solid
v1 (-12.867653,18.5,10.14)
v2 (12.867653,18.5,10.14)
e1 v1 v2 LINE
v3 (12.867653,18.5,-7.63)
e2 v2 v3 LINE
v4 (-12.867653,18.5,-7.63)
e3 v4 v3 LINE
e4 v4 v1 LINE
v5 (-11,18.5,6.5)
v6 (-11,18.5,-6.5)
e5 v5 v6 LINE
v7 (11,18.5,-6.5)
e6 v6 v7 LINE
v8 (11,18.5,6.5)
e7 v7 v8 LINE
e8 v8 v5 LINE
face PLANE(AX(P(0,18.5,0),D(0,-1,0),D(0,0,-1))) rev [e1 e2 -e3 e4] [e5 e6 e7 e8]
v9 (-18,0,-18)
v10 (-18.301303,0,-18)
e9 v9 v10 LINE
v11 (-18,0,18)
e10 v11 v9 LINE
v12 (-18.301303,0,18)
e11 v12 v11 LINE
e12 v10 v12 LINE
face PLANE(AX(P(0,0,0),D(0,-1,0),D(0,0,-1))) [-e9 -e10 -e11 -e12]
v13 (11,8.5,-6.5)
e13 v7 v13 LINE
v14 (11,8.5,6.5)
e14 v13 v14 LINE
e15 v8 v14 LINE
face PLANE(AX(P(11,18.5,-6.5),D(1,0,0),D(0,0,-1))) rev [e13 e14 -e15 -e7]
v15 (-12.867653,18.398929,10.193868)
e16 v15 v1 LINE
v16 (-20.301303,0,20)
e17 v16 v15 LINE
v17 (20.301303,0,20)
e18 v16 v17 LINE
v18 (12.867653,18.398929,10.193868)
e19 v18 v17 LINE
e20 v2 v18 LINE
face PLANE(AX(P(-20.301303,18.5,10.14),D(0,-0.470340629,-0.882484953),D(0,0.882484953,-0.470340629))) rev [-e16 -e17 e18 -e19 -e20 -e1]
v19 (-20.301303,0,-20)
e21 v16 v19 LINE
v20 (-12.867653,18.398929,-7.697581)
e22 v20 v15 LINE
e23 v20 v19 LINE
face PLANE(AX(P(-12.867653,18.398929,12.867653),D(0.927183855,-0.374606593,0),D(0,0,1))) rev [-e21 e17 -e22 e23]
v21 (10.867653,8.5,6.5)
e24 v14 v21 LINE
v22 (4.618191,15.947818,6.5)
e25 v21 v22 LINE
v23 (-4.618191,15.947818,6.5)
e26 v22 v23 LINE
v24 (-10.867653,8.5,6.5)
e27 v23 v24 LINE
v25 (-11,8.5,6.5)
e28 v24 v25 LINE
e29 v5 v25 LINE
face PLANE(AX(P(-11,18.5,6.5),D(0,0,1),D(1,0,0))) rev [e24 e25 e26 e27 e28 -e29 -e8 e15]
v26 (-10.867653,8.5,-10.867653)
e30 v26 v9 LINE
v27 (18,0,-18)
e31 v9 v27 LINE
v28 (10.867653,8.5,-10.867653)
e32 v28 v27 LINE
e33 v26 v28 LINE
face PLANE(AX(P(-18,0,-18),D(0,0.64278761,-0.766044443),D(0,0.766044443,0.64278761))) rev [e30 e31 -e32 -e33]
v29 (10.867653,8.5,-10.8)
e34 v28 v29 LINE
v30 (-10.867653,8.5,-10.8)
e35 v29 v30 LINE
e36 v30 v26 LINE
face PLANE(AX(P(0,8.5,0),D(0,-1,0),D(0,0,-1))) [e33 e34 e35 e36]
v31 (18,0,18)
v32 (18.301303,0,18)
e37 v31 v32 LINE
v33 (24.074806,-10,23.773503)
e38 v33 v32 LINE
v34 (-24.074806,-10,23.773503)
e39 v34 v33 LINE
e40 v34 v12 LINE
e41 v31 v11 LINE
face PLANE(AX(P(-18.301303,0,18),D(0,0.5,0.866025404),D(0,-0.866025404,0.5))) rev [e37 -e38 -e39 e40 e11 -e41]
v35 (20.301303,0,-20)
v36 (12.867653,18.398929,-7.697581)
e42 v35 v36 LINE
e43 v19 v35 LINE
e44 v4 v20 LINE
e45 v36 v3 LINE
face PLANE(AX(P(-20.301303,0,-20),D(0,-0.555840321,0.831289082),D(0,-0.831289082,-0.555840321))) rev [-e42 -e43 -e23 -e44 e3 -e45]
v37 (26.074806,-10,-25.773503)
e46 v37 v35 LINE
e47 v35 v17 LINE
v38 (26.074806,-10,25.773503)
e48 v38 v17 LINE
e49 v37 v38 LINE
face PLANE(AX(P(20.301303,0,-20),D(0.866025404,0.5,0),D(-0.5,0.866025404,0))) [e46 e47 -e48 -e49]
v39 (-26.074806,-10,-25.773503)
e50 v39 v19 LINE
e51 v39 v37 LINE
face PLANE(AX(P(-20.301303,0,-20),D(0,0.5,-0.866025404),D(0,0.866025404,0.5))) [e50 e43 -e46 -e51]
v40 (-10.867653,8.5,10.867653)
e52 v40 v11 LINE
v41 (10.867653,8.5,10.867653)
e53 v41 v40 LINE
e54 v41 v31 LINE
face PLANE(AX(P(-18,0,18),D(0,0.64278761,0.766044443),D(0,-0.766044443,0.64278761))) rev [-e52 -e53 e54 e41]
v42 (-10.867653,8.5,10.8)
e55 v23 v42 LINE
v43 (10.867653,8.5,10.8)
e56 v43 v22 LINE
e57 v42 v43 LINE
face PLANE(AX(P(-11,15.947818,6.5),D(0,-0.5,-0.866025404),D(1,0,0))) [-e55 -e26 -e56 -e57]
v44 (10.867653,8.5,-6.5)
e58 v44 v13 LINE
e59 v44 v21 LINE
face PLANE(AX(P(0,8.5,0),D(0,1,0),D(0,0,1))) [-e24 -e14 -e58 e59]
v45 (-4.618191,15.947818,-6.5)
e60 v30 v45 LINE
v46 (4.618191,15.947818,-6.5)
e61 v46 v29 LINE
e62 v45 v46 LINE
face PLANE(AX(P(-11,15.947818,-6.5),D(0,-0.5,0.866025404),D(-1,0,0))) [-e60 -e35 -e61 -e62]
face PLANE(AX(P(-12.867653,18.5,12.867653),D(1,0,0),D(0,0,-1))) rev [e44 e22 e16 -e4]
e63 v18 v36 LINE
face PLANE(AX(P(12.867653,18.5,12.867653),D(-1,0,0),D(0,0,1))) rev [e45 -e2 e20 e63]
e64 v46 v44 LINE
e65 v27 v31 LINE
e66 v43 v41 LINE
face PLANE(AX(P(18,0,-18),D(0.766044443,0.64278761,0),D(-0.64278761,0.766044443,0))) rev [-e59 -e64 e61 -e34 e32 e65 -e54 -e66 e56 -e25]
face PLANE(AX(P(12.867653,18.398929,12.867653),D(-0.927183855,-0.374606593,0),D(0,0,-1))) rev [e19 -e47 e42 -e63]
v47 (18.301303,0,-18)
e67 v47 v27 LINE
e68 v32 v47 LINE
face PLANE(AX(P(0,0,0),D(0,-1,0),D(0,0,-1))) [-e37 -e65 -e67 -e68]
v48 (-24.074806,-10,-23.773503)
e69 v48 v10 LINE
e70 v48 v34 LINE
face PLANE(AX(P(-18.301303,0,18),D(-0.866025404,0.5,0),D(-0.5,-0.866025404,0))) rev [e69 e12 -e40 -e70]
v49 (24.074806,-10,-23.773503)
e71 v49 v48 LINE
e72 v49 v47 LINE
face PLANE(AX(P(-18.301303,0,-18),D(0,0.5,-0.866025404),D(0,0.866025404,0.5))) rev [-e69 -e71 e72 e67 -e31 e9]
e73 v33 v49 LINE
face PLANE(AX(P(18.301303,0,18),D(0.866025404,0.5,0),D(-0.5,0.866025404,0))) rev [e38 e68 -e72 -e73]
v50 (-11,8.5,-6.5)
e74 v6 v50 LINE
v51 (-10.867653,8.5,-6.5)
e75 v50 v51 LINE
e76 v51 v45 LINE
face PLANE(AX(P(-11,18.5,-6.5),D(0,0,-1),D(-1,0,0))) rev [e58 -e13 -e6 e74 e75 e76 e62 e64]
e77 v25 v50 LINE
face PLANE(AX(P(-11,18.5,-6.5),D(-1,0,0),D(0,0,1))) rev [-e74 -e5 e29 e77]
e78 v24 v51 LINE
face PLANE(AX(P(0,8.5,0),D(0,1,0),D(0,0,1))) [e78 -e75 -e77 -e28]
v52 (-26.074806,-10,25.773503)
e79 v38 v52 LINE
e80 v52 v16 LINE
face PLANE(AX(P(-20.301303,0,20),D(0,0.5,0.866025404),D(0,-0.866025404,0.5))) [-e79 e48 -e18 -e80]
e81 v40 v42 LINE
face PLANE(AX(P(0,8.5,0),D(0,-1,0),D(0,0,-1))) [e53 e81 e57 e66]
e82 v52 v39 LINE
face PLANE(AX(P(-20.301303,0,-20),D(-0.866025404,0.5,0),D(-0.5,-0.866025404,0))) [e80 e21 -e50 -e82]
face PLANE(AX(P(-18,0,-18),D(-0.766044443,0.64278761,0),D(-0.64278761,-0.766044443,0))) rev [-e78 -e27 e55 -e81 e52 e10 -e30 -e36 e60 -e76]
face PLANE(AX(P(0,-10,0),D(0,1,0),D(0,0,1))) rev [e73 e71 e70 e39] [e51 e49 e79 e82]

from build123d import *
from OCP.BRepFilletAPI import BRepFilletAPI_MakeChamfer

# Parameters (mm, degrees)
SKETCH1_W               = 40
SKETCH1_H               = 40
BOSS_EXTRUDE1_DEPTH     = 8.5
BOSS_EXTRUDE1_TAPER     = 40
SKETCH2_W               = 36
SKETCH2_H               = 36
CUT_EXTRUDE1_DEPTH      = 15
CUT_EXTRUDE1_DRAFT      = -40
SKETCH4_W               = 25.73530627
SKETCH4_H               = 25.73530627
BOSS_EXTRUDE3_DEPTH     = 10
SKETCH5_W               = 22
SKETCH5_H               = 13
CUT_EXTRUDE2_DEPTH      = 31.000000133
CHAMFER2_SIZE           = 12
CHAMFER2_SIZE_2         = 9.89892863
CUT_EXTRUDE3_DEPTH      = 35.154586706
CUT_EXTRUDE3_DEPTH_BACK = 35.154586706
CHAMFER3_SIZE           = 4.3
CHAMFER3_SIZE2          = 7.447818473
CUT_EXTRUDE4_DEPTH      = 35.154586706
CUT_EXTRUDE4_DEPTH_BACK = 35.154586706
SKETCH9_W               = 40.602605658
SKETCH9_H               = 40
BOSS_EXTRUDE4_DEPTH     = 10
BOSS_EXTRUDE4_DRAFT     = -30
SKETCH10_W              = 36.602605658
SKETCH10_H              = 36
CUT_EXTRUDE5_DEPTH      = 10
CUT_EXTRUDE5_DRAFT      = 30


with BuildPart() as part:
    # Sketch1 → Boss-Extrude1 (new body)
    with BuildSketch(Plane(origin=(0, 0, 0), x_dir=(1, 0, 0), z_dir=(0, 1, 0))):
        Rectangle(SKETCH1_W, SKETCH1_H)
    extrude(amount=BOSS_EXTRUDE1_DEPTH, taper=BOSS_EXTRUDE1_TAPER)


with BuildPart() as cut_extrude1_tool:
    # Sketch2 → Cut-Extrude1 (with draft: the straight prism first)
    with BuildSketch(Plane.XZ):
        Rectangle(SKETCH2_W, SKETCH2_H)
    extrude(amount=-CUT_EXTRUDE1_DEPTH)
    # Cut-Extrude1: the draft: its side faces are tilted about the plane it starts from
    cut_extrude1_sides = [cut_extrude1_tool.faces().sort_by_distance(p)[0] for p in [
        (0, 7.5, -18),
        (18, 7.5, 0),
        (0, 7.5, 18),
        (-18, 7.5, 0),
    ]]
    draft(cut_extrude1_sides, Plane.XZ, CUT_EXTRUDE1_DRAFT)


with BuildPart() as part_1:
    add(part.part)

    # Cut-Extrude1: cut by cut_extrude1_tool
    add(cut_extrude1_tool.part, mode=Mode.SUBTRACT)

    # Sketch4 → Boss-Extrude3 (add)
    with BuildSketch(Plane(origin=(0, 8.5, 0), x_dir=(1, 0, 0), z_dir=(0, 1, 0))):
        Rectangle(SKETCH4_W, SKETCH4_H)
    extrude(amount=BOSS_EXTRUDE3_DEPTH)

    # Sketch5 → Cut-Extrude2 (cut, through all)
    with BuildSketch(Plane.XZ.offset(-8.5)):
        Rectangle(SKETCH5_W, SKETCH5_H)
    extrude(amount=-CUT_EXTRUDE2_DEPTH, mode=Mode.SUBTRACT)

    # Chamfer2
    # the kernel refuses this chamfer: 12, 9.89892863 mm, written as the material it adds along each edge
    with BuildSketch(Plane(origin=(12.867653135, 8.5, 44.011128682), x_dir=(0.6427876096865404, -0.7660444431189772, 0), z_dir=(0, 0, -1))) as chamfer2_piece_1_section:
        Polygon((CHAMFER2_SIZE, 0), (-CHAMFER2_SIZE_2 * 0.766044443108, -CHAMFER2_SIZE_2 * 0.642787609677), (0, 0), align=None)
    chamfer2_piece_1 = extrude(amount=88.022257365, mode=Mode.PRIVATE)
    chamfer2_piece_1 = split(chamfer2_piece_1, bisect_by=Plane(origin=(12.867653135, 0, 44.011128682), z_dir=(0, 1, 0)), keep=Keep.TOP, mode=Mode.PRIVATE)
    chamfer2_piece_1 = split(chamfer2_piece_1, bisect_by=Plane(origin=(12.867653135, -0.927920344, 20.676206983), z_dir=(0, -0.37460659341591307, -0.927183854566787)), keep=Keep.TOP, mode=Mode.PRIVATE)
    chamfer2_piece_1 = split(chamfer2_piece_1, bisect_by=Plane(origin=(12.867653135, 29.644778588, -8.32403482), z_dir=(0, -0.3746065934159128, 0.9271838545667871)), keep=Keep.TOP, mode=Mode.PRIVATE)
    add(chamfer2_piece_1)
    with BuildSketch(Plane(origin=(-12.867653135, 8.5, -44.011128682), x_dir=(-0.6427876096865406, -0.766044443118977, 0), z_dir=(0, 0, 1))) as chamfer2_piece_2_section:
        Polygon((CHAMFER2_SIZE, 0), (-CHAMFER2_SIZE_2 * 0.766044443108, -CHAMFER2_SIZE_2 * 0.642787609677), (0, 0), align=None)
    chamfer2_piece_2 = extrude(amount=88.022257365, mode=Mode.PRIVATE)
    chamfer2_piece_2 = split(chamfer2_piece_2, bisect_by=Plane(origin=(-12.867653135, 0, -44.011128682), z_dir=(0, 1, 0)), keep=Keep.TOP, mode=Mode.PRIVATE)
    chamfer2_piece_2 = split(chamfer2_piece_2, bisect_by=Plane(origin=(-12.867653135, -0.927920344, -20.676206983), z_dir=(0, -0.3746065934159128, 0.9271838545667871)), keep=Keep.TOP, mode=Mode.PRIVATE)
    chamfer2_piece_2 = split(chamfer2_piece_2, bisect_by=Plane(origin=(-12.867653135, 29.644778588, 8.32403482), z_dir=(0, -0.37460659341591307, -0.927183854566787)), keep=Keep.TOP, mode=Mode.PRIVATE)
    add(chamfer2_piece_2)
    with BuildSketch(Plane(origin=(-44.011128682, 8.5, 12.867653135), x_dir=(0, -0.766044443118977, 0.6427876096865405), z_dir=(1, 0, 0))) as chamfer2_piece_3_section:
        Polygon((CHAMFER2_SIZE, 0), (-CHAMFER2_SIZE_2 * 0.766044443108, -CHAMFER2_SIZE_2 * 0.642787609677), (0, 0), align=None)
    chamfer2_piece_3 = extrude(amount=88.022257365, mode=Mode.PRIVATE)
    chamfer2_piece_3 = split(chamfer2_piece_3, bisect_by=Plane(origin=(-44.011128682, 0, 12.867653135), z_dir=(0, 1, 0)), keep=Keep.TOP, mode=Mode.PRIVATE)
    chamfer2_piece_3 = split(chamfer2_piece_3, bisect_by=Plane(origin=(-20.676206983, -0.927920344, 12.867653135), z_dir=(0.927183854566787, -0.37460659341591307, 0)), keep=Keep.TOP, mode=Mode.PRIVATE)
    chamfer2_piece_3 = split(chamfer2_piece_3, bisect_by=Plane(origin=(8.32403482, 29.644778588, 12.867653135), z_dir=(-0.9271838545667872, -0.37460659341591274, 0)), keep=Keep.TOP, mode=Mode.PRIVATE)
    add(chamfer2_piece_3)
    with BuildSketch(Plane(origin=(44.011128682, 8.5, -12.867653135), x_dir=(0, -0.766044443118977, -0.6427876096865405), z_dir=(-1, 0, 0))) as chamfer2_piece_4_section:
        Polygon((CHAMFER2_SIZE, 0), (-CHAMFER2_SIZE_2 * 0.766044443108, -CHAMFER2_SIZE_2 * 0.642787609677), (0, 0), align=None)
    chamfer2_piece_4 = extrude(amount=88.022257365, mode=Mode.PRIVATE)
    chamfer2_piece_4 = split(chamfer2_piece_4, bisect_by=Plane(origin=(44.011128682, 0, -12.867653135), z_dir=(0, 1, 0)), keep=Keep.TOP, mode=Mode.PRIVATE)
    chamfer2_piece_4 = split(chamfer2_piece_4, bisect_by=Plane(origin=(-8.32403482, 29.644778588, -12.867653135), z_dir=(0.927183854566787, -0.37460659341591307, 0)), keep=Keep.TOP, mode=Mode.PRIVATE)
    chamfer2_piece_4 = split(chamfer2_piece_4, bisect_by=Plane(origin=(20.676206983, -0.927920344, -12.867653135), z_dir=(-0.9271838545667872, -0.37460659341591274, 0)), keep=Keep.TOP, mode=Mode.PRIVATE)
    add(chamfer2_piece_4)

    # Sketch7 → Cut-Extrude3 (cut, two sides: drawn at the far end of the back side and taken through both)
    with BuildSketch(Plane(origin=(0, 0, 0), x_dir=(0, 0, -1), z_dir=(1, 0, 0)).offset(-CUT_EXTRUDE3_DEPTH_BACK)):
        Polygon((-20, 0), (-24.78585356, 0), (-24.78585356, 18.532984169), (-10.14, 18.5), align=None)
    extrude(amount=CUT_EXTRUDE3_DEPTH + CUT_EXTRUDE3_DEPTH_BACK, mode=Mode.SUBTRACT)

    # Chamfer3: one chamfer whose edges measure the first distance from different faces: ONE call of the kernel's chamfer builder (chamfer() names one face for all edges)
    chamfer3_edges_1 = [part_1.edges().sort_by_distance(p)[0] for p in [
        (0, 8.5, 6.5),
    ]]
    chamfer3_side_1 = [part_1.faces().sort_by_distance(p)[0] for p in [
        (0, 8.5, 8.683826567),
    ]]
    chamfer3_edges_2 = [part_1.edges().sort_by_distance(p)[0] for p in [
        (0, 8.5, -6.5),
    ]]
    chamfer3_side_2 = [part_1.faces().sort_by_distance(p)[0] for p in [
        (0, 8.5, -8.683826567),
    ]]
    chamfer3 = BRepFilletAPI_MakeChamfer(part_1.part.solid().wrapped)
    for e in chamfer3_edges_1:
        chamfer3.Add(CHAMFER3_SIZE, CHAMFER3_SIZE2, e.wrapped, chamfer3_side_1[0].wrapped)  # the first distance lies on this face
    for e in chamfer3_edges_2:
        chamfer3.Add(CHAMFER3_SIZE, CHAMFER3_SIZE2, e.wrapped, chamfer3_side_2[0].wrapped)  # the first distance lies on this face
    add(Compound.cast(chamfer3.Shape()), mode=Mode.REPLACE)

    # Sketch8 → Cut-Extrude4 (cut, two sides: drawn at the far end of the back side and taken through both)
    with BuildSketch(Plane(origin=(0, 0, 0), x_dir=(0, 0, -1), z_dir=(1, 0, 0)).offset(-CUT_EXTRUDE4_DEPTH_BACK)):
        Polygon((7.63, 18.5), (12.867653135, 18.5), (21.160182577, 0), (20, 0), align=None)
    extrude(amount=CUT_EXTRUDE4_DEPTH + CUT_EXTRUDE4_DEPTH_BACK, mode=Mode.SUBTRACT)


with BuildPart() as boss_extrude4_tool:
    # Sketch9 → Boss-Extrude4 (with draft: the straight prism first)
    with BuildSketch(Plane.XZ):
        Rectangle(SKETCH9_W, SKETCH9_H)
    extrude(amount=BOSS_EXTRUDE4_DEPTH)
    # Boss-Extrude4: the draft: its side faces are tilted about the plane it starts from
    boss_extrude4_sides = [boss_extrude4_tool.faces().sort_by_distance(p)[0] for p in [
        (0, -5, -20),
        (20.301302829, -5, 0),
        (0, -5, 20),
        (-20.301302829, -5, 0),
    ]]
    draft(boss_extrude4_sides, Plane.XZ, BOSS_EXTRUDE4_DRAFT)


with BuildPart() as part_2:
    add(part_1.part)

    # Boss-Extrude4: add boss_extrude4_tool
    add(boss_extrude4_tool.part)


with BuildPart() as cut_extrude5_tool:
    # Sketch10 → Cut-Extrude5 (with draft: the straight prism first)
    with BuildSketch(Plane(origin=(0, 0, 0), x_dir=(1, 0, 0), z_dir=(0, 1, 0))):
        Rectangle(SKETCH10_W, SKETCH10_H)
    extrude(amount=-CUT_EXTRUDE5_DEPTH)
    # Cut-Extrude5: the draft: its side faces are tilted about the plane it starts from
    cut_extrude5_sides = [cut_extrude5_tool.faces().sort_by_distance(p)[0] for p in [
        (0, -5, 18),
        (18.301302829, -5, 0),
        (0, -5, -18),
        (-18.301302829, -5, 0),
    ]]
    draft(cut_extrude5_sides, Plane(origin=(0, 0, 0), x_dir=(1, 0, 0), z_dir=(0, 1, 0)), CUT_EXTRUDE5_DRAFT)


with BuildPart() as part_3:
    add(part_2.part)

    # Cut-Extrude5: cut by cut_extrude5_tool
    add(cut_extrude5_tool.part, mode=Mode.SUBTRACT)


solid = part_3.part
